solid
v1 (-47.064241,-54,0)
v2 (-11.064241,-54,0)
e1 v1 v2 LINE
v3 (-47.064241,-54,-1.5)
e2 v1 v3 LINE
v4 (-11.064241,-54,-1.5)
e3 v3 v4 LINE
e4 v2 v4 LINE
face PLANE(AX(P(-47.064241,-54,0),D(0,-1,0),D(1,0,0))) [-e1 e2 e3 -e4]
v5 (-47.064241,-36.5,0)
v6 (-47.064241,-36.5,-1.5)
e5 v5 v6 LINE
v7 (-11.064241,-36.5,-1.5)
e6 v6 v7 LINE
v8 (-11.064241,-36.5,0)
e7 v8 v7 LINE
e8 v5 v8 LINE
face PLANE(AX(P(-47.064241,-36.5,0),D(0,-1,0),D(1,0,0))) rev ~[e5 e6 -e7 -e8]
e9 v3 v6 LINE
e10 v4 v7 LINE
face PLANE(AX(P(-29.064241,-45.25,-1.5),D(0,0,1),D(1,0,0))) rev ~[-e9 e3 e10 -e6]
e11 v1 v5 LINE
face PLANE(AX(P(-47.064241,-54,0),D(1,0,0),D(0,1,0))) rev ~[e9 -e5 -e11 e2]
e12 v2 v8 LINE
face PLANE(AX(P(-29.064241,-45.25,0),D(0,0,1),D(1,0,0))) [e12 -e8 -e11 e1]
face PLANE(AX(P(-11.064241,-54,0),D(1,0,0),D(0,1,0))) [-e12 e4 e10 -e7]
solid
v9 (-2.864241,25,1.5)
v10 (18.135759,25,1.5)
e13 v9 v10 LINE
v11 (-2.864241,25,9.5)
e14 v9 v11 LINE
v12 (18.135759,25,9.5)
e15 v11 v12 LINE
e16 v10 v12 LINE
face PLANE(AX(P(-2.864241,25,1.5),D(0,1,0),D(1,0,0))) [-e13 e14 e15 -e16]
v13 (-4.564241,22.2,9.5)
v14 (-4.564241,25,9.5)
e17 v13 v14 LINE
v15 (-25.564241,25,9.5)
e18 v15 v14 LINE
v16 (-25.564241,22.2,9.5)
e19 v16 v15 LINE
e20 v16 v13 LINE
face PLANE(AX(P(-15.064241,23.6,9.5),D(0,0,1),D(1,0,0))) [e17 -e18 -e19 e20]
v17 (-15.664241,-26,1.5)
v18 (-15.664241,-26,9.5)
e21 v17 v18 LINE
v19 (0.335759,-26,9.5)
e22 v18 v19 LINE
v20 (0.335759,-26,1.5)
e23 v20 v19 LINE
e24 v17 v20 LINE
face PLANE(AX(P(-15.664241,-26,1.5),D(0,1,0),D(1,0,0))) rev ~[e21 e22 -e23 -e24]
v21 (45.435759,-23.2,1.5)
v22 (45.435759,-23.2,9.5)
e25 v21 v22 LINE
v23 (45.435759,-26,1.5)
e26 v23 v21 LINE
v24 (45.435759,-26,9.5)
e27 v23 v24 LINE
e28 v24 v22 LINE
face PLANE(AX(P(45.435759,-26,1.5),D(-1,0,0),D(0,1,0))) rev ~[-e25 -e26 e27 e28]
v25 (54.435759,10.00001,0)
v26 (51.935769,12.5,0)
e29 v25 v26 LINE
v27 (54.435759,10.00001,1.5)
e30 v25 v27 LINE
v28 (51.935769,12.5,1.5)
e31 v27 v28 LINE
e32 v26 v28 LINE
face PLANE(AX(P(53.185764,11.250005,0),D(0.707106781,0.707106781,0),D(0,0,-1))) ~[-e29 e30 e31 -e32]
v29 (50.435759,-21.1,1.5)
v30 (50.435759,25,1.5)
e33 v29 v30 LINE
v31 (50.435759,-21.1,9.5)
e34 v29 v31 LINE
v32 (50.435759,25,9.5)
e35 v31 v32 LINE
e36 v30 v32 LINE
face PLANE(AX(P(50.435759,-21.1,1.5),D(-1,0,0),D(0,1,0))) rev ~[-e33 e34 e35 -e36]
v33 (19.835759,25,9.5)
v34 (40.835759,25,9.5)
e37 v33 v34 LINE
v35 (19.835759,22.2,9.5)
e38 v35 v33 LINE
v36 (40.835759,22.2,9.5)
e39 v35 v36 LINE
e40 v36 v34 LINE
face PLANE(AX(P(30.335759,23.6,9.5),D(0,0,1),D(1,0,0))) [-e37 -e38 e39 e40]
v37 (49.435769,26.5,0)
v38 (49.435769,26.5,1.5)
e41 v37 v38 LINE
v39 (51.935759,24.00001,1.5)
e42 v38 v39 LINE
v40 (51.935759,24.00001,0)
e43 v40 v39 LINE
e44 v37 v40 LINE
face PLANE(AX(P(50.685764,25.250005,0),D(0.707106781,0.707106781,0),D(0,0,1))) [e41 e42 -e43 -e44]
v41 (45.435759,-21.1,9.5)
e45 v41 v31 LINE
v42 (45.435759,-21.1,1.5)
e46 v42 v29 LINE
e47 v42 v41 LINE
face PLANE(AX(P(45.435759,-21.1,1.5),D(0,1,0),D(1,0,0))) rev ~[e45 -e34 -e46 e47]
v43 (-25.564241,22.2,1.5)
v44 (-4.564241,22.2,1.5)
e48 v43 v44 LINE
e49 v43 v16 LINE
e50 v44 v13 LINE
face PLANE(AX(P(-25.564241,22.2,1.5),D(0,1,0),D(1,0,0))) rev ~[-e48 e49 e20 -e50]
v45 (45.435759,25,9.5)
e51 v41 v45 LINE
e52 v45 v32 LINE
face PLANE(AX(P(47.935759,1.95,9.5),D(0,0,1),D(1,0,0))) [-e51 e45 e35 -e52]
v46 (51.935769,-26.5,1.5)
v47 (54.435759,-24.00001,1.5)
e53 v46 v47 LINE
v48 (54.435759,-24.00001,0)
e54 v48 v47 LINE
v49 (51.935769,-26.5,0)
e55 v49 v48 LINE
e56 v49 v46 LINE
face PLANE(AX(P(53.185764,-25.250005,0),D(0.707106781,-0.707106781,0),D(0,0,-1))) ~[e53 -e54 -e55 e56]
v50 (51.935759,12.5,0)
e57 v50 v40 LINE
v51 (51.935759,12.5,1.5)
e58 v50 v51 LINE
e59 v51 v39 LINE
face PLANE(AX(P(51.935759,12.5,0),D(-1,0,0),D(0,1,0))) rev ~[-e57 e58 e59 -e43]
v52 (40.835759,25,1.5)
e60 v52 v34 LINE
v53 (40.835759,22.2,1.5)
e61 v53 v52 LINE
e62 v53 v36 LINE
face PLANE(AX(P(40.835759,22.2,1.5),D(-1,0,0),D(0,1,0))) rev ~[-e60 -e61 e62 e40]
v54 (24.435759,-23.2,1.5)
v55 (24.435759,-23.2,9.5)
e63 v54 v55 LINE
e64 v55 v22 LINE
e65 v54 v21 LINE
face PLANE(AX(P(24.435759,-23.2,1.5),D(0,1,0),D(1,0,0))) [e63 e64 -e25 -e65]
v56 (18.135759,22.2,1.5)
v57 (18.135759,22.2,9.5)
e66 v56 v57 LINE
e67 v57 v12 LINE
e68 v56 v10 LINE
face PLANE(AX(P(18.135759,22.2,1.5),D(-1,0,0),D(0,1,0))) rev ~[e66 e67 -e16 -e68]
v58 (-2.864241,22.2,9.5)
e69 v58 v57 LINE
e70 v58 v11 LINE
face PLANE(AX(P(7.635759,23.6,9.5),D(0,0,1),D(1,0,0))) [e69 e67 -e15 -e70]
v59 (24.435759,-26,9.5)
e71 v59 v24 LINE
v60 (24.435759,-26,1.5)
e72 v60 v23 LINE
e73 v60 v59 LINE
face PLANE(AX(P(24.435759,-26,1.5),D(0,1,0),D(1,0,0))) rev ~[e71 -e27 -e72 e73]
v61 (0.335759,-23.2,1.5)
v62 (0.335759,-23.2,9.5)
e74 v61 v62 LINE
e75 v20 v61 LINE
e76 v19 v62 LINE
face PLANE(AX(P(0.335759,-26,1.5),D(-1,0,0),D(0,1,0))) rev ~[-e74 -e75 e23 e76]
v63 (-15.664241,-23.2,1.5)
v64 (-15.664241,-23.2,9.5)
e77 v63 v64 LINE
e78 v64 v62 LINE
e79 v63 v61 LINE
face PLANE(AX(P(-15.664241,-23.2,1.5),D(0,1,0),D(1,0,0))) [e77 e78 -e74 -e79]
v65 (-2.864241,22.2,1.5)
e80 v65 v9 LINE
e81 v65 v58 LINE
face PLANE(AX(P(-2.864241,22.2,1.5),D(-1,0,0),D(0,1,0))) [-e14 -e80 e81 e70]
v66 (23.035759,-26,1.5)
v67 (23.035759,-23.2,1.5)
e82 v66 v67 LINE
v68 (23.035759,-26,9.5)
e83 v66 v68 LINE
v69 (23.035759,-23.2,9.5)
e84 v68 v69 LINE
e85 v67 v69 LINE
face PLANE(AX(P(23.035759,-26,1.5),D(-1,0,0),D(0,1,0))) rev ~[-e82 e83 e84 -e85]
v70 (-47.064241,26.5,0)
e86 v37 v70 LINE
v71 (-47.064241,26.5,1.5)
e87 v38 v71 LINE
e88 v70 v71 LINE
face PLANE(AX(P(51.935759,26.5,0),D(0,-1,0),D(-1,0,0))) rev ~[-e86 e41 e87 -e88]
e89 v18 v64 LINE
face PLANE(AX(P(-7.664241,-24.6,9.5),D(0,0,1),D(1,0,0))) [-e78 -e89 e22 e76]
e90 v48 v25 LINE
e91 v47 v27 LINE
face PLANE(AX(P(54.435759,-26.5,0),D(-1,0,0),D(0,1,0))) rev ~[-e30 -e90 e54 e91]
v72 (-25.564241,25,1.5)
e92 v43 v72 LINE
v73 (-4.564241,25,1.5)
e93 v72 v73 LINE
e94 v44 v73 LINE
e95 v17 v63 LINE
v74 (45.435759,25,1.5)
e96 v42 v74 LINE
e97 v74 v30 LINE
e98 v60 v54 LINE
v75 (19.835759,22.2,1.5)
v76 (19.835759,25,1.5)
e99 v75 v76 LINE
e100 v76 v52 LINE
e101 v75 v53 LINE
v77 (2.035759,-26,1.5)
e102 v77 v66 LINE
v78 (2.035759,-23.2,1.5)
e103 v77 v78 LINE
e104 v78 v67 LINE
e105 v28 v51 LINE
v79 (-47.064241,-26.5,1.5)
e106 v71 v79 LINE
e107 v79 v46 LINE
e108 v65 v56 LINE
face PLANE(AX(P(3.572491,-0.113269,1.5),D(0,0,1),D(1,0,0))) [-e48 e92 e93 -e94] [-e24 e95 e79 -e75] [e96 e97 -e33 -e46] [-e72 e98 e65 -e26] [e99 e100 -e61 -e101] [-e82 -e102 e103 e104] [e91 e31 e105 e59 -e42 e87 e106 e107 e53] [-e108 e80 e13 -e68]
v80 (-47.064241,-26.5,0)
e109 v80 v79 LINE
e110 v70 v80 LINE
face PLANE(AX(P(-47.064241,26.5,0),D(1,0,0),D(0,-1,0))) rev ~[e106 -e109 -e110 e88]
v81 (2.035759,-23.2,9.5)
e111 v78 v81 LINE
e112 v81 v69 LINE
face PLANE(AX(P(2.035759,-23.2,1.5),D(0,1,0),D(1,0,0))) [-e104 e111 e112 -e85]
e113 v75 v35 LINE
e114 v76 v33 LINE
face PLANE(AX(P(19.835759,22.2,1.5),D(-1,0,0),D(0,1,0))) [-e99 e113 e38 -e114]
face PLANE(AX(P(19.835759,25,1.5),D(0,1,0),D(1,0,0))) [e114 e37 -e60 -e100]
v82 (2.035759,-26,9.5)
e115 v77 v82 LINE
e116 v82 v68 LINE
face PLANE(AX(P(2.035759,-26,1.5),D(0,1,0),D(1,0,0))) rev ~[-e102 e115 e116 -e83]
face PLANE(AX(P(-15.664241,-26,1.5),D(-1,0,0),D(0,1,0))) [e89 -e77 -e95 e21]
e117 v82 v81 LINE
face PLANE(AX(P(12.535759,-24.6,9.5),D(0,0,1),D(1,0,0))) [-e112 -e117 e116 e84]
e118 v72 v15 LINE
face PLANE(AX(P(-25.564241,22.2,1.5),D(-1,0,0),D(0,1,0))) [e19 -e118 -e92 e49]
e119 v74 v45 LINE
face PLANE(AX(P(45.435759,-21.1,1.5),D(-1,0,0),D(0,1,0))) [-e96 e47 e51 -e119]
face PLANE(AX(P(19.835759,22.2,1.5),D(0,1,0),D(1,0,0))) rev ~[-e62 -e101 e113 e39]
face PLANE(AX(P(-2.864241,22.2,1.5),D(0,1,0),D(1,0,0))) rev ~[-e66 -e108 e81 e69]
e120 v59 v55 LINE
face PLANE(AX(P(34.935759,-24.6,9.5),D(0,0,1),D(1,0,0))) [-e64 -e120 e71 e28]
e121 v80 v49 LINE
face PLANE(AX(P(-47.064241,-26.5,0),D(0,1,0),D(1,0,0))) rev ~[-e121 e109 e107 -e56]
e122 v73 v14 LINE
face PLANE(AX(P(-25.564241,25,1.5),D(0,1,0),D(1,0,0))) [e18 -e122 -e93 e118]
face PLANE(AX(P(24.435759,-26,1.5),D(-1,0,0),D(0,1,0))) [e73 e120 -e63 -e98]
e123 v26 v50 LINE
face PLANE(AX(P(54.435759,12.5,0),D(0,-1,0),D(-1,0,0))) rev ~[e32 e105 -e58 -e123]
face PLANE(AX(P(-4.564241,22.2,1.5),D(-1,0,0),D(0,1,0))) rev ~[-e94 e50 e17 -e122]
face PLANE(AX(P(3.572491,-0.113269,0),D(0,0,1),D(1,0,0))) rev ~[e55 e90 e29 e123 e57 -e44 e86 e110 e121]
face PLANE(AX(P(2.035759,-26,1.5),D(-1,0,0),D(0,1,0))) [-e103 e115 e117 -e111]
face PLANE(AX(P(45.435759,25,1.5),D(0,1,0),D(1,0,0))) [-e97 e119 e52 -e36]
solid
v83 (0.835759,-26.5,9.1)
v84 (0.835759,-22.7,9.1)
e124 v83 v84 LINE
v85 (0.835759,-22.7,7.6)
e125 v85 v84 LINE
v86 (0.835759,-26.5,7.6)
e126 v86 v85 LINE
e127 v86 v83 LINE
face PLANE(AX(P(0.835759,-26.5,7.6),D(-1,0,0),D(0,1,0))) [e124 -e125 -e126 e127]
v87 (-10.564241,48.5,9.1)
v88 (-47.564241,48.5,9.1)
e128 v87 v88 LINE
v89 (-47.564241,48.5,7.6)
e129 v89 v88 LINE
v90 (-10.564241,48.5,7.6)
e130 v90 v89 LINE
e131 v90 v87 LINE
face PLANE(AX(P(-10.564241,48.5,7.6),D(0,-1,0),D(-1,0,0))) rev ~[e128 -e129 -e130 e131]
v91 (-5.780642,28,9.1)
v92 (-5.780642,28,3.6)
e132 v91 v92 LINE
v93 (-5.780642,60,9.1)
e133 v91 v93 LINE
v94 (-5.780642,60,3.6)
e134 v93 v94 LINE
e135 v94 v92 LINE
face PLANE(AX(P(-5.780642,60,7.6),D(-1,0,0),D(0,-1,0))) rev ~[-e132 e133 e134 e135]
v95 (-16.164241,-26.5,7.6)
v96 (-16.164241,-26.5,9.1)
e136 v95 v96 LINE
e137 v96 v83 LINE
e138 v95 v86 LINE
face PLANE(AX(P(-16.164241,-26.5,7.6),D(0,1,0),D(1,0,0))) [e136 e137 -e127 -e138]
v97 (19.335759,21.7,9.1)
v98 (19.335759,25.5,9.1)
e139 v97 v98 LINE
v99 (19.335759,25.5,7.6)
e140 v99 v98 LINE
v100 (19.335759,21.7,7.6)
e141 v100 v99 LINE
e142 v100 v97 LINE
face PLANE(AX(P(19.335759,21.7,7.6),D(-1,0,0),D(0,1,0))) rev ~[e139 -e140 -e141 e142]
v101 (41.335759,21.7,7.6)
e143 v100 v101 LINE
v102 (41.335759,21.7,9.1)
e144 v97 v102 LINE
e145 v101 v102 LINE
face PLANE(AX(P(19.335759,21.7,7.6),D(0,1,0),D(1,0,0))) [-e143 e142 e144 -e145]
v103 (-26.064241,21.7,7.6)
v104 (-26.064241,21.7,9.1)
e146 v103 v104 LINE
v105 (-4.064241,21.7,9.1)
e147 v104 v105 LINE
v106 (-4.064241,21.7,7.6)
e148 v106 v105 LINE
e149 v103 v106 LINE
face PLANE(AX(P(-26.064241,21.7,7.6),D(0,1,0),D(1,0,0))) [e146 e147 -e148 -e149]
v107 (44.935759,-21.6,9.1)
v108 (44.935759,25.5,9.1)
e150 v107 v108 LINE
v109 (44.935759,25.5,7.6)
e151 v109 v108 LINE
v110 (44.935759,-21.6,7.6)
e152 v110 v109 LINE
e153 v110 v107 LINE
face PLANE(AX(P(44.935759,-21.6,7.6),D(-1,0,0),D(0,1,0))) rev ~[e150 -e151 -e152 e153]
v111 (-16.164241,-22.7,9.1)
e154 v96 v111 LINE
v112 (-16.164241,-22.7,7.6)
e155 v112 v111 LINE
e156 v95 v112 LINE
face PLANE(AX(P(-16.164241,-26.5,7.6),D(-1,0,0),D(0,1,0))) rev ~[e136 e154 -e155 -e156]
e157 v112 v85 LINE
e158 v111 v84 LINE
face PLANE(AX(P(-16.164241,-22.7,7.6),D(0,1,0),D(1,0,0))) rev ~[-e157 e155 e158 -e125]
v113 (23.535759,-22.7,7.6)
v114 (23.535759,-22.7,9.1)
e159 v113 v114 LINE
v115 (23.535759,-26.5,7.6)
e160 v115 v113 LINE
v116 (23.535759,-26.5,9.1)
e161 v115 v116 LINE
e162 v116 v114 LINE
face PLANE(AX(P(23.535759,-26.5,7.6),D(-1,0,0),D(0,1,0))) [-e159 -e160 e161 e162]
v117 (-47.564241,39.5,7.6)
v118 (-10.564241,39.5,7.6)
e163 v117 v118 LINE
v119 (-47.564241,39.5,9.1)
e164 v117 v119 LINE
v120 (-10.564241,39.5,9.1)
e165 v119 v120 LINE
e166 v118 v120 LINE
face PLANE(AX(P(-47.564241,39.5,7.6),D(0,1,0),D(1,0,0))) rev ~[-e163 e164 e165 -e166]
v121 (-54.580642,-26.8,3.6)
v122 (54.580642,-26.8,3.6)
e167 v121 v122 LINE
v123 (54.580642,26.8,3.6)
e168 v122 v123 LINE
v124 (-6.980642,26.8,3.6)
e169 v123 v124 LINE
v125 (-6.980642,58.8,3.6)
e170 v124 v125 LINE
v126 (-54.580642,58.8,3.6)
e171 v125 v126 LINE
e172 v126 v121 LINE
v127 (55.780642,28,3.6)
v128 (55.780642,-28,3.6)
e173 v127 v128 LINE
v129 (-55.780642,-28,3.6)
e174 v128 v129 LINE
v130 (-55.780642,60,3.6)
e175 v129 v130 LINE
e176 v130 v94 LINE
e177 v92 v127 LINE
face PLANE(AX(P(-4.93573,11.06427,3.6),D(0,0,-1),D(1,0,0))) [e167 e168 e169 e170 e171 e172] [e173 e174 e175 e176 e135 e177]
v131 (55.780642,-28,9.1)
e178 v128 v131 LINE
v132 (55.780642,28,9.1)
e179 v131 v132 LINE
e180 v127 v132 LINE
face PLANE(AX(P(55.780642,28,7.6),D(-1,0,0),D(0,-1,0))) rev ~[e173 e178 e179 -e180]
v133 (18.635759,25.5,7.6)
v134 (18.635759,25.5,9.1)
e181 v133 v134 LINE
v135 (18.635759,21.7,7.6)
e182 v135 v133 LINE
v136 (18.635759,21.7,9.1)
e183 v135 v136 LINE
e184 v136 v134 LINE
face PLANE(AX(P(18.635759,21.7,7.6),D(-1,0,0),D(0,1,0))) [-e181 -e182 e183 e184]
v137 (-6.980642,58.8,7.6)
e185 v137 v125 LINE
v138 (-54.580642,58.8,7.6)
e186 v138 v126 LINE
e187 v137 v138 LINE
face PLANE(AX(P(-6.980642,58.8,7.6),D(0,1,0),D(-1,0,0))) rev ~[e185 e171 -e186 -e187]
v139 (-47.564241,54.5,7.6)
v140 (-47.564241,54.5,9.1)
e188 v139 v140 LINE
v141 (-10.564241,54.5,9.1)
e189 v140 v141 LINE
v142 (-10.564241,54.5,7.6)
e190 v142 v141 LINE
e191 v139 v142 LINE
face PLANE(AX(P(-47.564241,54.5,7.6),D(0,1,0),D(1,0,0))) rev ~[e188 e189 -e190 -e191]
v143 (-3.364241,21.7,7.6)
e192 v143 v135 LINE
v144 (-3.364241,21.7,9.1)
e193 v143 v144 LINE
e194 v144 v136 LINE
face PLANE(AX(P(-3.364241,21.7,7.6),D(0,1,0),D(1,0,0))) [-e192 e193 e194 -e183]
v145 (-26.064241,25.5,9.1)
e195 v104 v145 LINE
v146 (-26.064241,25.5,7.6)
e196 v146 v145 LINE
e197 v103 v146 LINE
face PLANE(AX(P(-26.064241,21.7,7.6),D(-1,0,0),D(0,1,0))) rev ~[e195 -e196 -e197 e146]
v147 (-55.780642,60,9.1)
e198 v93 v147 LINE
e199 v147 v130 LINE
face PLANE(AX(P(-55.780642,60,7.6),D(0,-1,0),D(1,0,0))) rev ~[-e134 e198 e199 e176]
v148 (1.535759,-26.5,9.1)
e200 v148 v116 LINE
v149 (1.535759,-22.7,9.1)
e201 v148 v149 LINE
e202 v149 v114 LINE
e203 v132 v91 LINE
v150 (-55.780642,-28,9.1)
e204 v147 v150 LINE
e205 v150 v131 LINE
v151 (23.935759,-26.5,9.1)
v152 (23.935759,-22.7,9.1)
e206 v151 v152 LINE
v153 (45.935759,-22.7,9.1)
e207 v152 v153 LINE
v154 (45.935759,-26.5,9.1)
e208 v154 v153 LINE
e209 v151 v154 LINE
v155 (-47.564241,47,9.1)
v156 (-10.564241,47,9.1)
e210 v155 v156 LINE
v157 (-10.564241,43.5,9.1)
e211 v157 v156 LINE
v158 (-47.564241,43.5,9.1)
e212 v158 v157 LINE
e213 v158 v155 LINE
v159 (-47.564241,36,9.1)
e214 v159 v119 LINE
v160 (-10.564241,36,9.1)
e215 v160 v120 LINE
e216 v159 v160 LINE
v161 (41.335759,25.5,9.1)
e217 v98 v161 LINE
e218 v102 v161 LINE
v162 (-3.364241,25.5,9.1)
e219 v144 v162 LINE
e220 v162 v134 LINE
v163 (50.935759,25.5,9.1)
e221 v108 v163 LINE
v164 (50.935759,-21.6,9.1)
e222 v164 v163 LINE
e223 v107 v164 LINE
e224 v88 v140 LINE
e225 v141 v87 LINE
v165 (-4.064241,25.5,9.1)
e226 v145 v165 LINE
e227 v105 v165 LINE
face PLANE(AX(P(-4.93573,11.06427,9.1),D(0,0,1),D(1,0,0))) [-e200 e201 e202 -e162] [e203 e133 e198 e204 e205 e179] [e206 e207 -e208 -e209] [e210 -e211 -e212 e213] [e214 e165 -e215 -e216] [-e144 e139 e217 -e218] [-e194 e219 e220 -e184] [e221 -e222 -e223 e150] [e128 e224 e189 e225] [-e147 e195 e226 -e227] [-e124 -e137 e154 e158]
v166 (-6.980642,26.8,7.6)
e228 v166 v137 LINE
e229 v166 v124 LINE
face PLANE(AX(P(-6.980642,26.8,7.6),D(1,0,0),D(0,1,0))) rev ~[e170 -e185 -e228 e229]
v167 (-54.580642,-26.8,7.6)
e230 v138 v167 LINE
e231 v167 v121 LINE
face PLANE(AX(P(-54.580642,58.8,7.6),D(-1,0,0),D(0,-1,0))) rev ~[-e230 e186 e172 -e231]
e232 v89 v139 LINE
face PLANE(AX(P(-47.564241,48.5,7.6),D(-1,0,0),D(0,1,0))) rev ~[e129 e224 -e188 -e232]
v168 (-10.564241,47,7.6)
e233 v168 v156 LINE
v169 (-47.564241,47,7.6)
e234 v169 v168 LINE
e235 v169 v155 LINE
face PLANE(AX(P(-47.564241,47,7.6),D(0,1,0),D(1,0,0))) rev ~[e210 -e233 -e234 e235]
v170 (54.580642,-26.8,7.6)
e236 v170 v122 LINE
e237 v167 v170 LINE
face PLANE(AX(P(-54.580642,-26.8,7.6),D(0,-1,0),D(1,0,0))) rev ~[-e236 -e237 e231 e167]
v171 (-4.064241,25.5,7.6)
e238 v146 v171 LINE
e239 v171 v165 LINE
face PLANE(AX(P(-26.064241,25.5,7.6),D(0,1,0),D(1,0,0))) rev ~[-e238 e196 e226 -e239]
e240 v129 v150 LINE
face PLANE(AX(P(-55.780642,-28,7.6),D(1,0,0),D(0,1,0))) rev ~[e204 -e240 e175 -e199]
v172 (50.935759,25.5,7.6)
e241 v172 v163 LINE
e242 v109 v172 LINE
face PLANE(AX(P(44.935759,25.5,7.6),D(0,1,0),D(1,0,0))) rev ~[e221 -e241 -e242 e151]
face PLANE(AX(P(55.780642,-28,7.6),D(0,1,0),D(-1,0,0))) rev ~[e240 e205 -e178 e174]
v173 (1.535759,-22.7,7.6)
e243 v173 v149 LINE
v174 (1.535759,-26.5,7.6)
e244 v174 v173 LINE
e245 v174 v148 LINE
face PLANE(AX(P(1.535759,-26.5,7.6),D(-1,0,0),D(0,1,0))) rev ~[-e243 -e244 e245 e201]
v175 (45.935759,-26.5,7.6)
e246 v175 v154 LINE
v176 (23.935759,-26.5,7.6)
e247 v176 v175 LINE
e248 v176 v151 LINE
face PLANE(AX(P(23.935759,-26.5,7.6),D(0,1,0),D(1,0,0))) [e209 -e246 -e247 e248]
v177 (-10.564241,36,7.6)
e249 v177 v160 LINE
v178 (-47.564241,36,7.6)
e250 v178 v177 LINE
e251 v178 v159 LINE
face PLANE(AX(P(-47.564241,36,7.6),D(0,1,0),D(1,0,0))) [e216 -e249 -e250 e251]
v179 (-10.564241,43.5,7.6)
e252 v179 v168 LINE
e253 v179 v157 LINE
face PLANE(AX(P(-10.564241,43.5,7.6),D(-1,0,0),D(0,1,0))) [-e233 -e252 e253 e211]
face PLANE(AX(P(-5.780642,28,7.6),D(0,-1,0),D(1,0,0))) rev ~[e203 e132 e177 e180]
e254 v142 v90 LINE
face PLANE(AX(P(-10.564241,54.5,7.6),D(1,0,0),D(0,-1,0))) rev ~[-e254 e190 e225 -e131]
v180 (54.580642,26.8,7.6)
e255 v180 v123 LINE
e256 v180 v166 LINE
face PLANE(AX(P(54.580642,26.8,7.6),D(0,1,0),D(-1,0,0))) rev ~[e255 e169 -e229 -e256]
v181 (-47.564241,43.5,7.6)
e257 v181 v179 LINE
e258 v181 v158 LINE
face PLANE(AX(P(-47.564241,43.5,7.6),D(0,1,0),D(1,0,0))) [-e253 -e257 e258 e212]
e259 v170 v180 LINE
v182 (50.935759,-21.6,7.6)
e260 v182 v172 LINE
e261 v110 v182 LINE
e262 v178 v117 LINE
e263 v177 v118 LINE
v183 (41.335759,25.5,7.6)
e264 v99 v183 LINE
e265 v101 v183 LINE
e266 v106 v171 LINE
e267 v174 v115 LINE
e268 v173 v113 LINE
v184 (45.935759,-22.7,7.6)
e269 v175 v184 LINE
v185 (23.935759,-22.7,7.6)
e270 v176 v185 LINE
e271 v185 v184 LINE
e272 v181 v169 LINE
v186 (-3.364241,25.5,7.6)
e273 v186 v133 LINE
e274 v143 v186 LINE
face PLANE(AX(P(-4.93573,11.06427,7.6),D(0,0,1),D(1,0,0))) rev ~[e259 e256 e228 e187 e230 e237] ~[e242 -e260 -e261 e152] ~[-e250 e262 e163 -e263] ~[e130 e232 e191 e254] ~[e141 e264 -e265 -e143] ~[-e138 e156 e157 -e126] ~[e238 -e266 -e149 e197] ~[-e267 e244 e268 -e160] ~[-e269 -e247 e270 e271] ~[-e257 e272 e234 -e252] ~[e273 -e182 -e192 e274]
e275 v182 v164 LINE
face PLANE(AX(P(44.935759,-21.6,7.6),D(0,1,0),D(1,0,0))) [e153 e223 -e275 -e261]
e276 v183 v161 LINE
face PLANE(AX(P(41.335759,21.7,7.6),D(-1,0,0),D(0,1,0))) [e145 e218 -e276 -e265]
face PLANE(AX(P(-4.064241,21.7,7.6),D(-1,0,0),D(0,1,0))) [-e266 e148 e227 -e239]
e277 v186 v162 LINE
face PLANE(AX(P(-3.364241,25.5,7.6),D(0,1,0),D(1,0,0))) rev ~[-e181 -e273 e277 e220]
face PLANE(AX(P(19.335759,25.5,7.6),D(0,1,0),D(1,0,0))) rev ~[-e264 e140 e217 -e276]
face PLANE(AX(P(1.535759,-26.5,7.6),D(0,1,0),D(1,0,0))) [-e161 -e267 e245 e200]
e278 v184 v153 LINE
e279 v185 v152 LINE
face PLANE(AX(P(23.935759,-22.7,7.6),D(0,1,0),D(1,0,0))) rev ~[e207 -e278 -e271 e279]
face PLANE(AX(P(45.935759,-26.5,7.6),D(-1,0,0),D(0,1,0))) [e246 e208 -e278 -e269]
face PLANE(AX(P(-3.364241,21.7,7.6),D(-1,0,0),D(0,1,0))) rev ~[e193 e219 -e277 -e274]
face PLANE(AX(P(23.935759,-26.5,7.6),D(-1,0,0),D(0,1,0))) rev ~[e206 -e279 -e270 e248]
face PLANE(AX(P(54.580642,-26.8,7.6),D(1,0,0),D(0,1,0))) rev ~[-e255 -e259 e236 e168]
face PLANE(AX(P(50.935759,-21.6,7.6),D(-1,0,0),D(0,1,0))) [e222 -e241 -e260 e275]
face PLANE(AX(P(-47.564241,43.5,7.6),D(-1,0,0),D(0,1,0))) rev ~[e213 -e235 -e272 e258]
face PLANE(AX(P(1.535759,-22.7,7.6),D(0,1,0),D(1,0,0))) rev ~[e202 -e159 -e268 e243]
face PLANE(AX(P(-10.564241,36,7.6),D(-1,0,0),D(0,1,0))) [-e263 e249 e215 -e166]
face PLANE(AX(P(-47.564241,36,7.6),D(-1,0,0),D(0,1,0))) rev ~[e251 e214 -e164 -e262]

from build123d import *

# Parameters (mm, degrees)
F1_DEPTH  = 1.5
F2_SIZE   = 2.49999
F3_W      = 21
F3_H      = 2.8
F3_W_2    = 5
F3_H_2    = 46.1
F3_W_3    = 16
F4_DEPTH  = 8
F5_W      = 36
F5_H      = 17.5
F6_DEPTH  = 1.5
F9_W      = 17
F9_H      = 3.8
F9_W_2    = 22
F9_W_3    = 37
F9_H_2    = 3.5
F9_W_4    = 6
F9_H_3    = 47.1
F10_DEPTH = 1.5
F12_DEPTH = 4


# Not quite as in the source:
# - a fillet or chamfer is up to 0.001 mm smaller than in the source, because OpenCascade refuses the exact size
# - a feature names something its author has since deleted; it is built from what else it names


with BuildPart() as f1:
    # F0 (on Top) → F1 (new body)
    with BuildSketch(Plane.XY):
        Polygon((51.935759174, 26.5), (-47.064240826, 26.5), (-47.064240826, -26.5), (54.435759174, -26.5), (54.435759174, 12.5), (51.935759174, 12.5), align=None)
    extrude(amount=F1_DEPTH)

    # F2 (size 2.5 in the source; OpenCascade refuses exactly that, so slightly less here)
    f2_edges = [f1.edges().sort_by_distance(p)[0] for p in [
        (54.435759, 12.5, 0.75),
        (51.935759, 26.5, 0.75),
        (54.435759, -26.5, 0.75),
    ]]
    chamfer(f2_edges, length=F2_SIZE)

    # F3 (on face) → F4 (join)
    with BuildSketch(Plane.XY.offset(1.5)):
        with Locations((-15.064240826, 23.6)):
            Rectangle(F3_W, F3_H)
        with Locations((7.635759174, 23.6)):
            Rectangle(F3_W, F3_H)
        with Locations((30.335759174, 23.6)):
            Rectangle(F3_W, F3_H)
        with Locations((47.935759174, 1.95)):
            Rectangle(F3_W_2, F3_H_2)
        with Locations((34.935759174, -24.6)):
            Rectangle(F3_W, F3_H)
        with Locations((12.535759174, -24.6)):
            Rectangle(F3_W, F3_H)
        with Locations((-7.664240826, -24.6)):
            Rectangle(F3_W_3, F3_H)
    extrude(amount=F4_DEPTH)


with BuildPart() as f6:
    # F5 (on Top) → F6 (new body)
    with BuildSketch(Plane.XY):
        with Locations((-29.064240826, -45.25)):
            Rectangle(F5_W, F5_H)
    extrude(amount=-F6_DEPTH)


with BuildPart() as f10:
    # F9 (on offset) → F10 (new body)
    with BuildSketch(Plane.XY.offset(7.6)):
        Polygon((-55.7806417346, 28), (-55.7806417346, -28), (-5.7806417346, -28), (55.7806417346, -28), (55.7806417346, 28), (-5.7806417346, 28), (-5.7806417346, 60), (-55.7806417346, 60), align=None)
        with Locations((-7.664240826, -24.6)):
            Rectangle(F9_W, F9_H, mode=Mode.SUBTRACT)
        with Locations((12.535759174, -24.6)):
            Rectangle(F9_W_2, F9_H, mode=Mode.SUBTRACT)
        with Locations((34.935759174, -24.6)):
            Rectangle(F9_W_2, F9_H, mode=Mode.SUBTRACT)
        with Locations((-15.064240826, 23.6)):
            Rectangle(F9_W_2, F9_H, mode=Mode.SUBTRACT)
        with Locations((-29.064240826, 37.75)):
            Rectangle(F9_W_3, F9_H_2, mode=Mode.SUBTRACT)
        with Locations((-29.064240826, 45.25)):
            Rectangle(F9_W_3, F9_H_2, mode=Mode.SUBTRACT)
        Polygon((-47.564240826, 48.5), (-47.564240826, 51.5), (-47.564240826, 54.5), (-10.564240826, 54.5), (-10.564240826, 51.5), (-10.564240826, 48.5), align=None, mode=Mode.SUBTRACT)
        with Locations((7.635759174, 23.6)):
            Rectangle(F9_W_2, F9_H, mode=Mode.SUBTRACT)
        with Locations((47.935759174, 1.95)):
            Rectangle(F9_W_4, F9_H_3, mode=Mode.SUBTRACT)
        with Locations((30.335759174, 23.6)):
            Rectangle(F9_W_2, F9_H, mode=Mode.SUBTRACT)
    extrude(amount=F10_DEPTH)

    # F11 (on face) → F12 (join)
    with BuildSketch(Plane(origin=(0, 0, 7.6), x_dir=(1, 0, 0), z_dir=(0, 0, -1))):
        Polygon((-55.7806417346, 28), (-55.7806417346, -28), (-55.7806417346, -60), (-5.7806417346, -60), (-5.7806417346, -28), (55.7806417346, -28), (55.7806417346, 28), (-5.7806417346, 28), align=None)
        Polygon((-54.5806417346, -58.8), (-54.5806417346, -30), (-54.5806417346, 26.8), (-6, 26.8), (54.5806417346, 26.8), (54.5806417346, -26.8), (-6.9806417346, -26.8), (-6.9806417346, -58.8), align=None, mode=Mode.SUBTRACT)
    extrude(amount=F12_DEPTH)


solid = Compound([f1.part, f6.part, f10.part])
